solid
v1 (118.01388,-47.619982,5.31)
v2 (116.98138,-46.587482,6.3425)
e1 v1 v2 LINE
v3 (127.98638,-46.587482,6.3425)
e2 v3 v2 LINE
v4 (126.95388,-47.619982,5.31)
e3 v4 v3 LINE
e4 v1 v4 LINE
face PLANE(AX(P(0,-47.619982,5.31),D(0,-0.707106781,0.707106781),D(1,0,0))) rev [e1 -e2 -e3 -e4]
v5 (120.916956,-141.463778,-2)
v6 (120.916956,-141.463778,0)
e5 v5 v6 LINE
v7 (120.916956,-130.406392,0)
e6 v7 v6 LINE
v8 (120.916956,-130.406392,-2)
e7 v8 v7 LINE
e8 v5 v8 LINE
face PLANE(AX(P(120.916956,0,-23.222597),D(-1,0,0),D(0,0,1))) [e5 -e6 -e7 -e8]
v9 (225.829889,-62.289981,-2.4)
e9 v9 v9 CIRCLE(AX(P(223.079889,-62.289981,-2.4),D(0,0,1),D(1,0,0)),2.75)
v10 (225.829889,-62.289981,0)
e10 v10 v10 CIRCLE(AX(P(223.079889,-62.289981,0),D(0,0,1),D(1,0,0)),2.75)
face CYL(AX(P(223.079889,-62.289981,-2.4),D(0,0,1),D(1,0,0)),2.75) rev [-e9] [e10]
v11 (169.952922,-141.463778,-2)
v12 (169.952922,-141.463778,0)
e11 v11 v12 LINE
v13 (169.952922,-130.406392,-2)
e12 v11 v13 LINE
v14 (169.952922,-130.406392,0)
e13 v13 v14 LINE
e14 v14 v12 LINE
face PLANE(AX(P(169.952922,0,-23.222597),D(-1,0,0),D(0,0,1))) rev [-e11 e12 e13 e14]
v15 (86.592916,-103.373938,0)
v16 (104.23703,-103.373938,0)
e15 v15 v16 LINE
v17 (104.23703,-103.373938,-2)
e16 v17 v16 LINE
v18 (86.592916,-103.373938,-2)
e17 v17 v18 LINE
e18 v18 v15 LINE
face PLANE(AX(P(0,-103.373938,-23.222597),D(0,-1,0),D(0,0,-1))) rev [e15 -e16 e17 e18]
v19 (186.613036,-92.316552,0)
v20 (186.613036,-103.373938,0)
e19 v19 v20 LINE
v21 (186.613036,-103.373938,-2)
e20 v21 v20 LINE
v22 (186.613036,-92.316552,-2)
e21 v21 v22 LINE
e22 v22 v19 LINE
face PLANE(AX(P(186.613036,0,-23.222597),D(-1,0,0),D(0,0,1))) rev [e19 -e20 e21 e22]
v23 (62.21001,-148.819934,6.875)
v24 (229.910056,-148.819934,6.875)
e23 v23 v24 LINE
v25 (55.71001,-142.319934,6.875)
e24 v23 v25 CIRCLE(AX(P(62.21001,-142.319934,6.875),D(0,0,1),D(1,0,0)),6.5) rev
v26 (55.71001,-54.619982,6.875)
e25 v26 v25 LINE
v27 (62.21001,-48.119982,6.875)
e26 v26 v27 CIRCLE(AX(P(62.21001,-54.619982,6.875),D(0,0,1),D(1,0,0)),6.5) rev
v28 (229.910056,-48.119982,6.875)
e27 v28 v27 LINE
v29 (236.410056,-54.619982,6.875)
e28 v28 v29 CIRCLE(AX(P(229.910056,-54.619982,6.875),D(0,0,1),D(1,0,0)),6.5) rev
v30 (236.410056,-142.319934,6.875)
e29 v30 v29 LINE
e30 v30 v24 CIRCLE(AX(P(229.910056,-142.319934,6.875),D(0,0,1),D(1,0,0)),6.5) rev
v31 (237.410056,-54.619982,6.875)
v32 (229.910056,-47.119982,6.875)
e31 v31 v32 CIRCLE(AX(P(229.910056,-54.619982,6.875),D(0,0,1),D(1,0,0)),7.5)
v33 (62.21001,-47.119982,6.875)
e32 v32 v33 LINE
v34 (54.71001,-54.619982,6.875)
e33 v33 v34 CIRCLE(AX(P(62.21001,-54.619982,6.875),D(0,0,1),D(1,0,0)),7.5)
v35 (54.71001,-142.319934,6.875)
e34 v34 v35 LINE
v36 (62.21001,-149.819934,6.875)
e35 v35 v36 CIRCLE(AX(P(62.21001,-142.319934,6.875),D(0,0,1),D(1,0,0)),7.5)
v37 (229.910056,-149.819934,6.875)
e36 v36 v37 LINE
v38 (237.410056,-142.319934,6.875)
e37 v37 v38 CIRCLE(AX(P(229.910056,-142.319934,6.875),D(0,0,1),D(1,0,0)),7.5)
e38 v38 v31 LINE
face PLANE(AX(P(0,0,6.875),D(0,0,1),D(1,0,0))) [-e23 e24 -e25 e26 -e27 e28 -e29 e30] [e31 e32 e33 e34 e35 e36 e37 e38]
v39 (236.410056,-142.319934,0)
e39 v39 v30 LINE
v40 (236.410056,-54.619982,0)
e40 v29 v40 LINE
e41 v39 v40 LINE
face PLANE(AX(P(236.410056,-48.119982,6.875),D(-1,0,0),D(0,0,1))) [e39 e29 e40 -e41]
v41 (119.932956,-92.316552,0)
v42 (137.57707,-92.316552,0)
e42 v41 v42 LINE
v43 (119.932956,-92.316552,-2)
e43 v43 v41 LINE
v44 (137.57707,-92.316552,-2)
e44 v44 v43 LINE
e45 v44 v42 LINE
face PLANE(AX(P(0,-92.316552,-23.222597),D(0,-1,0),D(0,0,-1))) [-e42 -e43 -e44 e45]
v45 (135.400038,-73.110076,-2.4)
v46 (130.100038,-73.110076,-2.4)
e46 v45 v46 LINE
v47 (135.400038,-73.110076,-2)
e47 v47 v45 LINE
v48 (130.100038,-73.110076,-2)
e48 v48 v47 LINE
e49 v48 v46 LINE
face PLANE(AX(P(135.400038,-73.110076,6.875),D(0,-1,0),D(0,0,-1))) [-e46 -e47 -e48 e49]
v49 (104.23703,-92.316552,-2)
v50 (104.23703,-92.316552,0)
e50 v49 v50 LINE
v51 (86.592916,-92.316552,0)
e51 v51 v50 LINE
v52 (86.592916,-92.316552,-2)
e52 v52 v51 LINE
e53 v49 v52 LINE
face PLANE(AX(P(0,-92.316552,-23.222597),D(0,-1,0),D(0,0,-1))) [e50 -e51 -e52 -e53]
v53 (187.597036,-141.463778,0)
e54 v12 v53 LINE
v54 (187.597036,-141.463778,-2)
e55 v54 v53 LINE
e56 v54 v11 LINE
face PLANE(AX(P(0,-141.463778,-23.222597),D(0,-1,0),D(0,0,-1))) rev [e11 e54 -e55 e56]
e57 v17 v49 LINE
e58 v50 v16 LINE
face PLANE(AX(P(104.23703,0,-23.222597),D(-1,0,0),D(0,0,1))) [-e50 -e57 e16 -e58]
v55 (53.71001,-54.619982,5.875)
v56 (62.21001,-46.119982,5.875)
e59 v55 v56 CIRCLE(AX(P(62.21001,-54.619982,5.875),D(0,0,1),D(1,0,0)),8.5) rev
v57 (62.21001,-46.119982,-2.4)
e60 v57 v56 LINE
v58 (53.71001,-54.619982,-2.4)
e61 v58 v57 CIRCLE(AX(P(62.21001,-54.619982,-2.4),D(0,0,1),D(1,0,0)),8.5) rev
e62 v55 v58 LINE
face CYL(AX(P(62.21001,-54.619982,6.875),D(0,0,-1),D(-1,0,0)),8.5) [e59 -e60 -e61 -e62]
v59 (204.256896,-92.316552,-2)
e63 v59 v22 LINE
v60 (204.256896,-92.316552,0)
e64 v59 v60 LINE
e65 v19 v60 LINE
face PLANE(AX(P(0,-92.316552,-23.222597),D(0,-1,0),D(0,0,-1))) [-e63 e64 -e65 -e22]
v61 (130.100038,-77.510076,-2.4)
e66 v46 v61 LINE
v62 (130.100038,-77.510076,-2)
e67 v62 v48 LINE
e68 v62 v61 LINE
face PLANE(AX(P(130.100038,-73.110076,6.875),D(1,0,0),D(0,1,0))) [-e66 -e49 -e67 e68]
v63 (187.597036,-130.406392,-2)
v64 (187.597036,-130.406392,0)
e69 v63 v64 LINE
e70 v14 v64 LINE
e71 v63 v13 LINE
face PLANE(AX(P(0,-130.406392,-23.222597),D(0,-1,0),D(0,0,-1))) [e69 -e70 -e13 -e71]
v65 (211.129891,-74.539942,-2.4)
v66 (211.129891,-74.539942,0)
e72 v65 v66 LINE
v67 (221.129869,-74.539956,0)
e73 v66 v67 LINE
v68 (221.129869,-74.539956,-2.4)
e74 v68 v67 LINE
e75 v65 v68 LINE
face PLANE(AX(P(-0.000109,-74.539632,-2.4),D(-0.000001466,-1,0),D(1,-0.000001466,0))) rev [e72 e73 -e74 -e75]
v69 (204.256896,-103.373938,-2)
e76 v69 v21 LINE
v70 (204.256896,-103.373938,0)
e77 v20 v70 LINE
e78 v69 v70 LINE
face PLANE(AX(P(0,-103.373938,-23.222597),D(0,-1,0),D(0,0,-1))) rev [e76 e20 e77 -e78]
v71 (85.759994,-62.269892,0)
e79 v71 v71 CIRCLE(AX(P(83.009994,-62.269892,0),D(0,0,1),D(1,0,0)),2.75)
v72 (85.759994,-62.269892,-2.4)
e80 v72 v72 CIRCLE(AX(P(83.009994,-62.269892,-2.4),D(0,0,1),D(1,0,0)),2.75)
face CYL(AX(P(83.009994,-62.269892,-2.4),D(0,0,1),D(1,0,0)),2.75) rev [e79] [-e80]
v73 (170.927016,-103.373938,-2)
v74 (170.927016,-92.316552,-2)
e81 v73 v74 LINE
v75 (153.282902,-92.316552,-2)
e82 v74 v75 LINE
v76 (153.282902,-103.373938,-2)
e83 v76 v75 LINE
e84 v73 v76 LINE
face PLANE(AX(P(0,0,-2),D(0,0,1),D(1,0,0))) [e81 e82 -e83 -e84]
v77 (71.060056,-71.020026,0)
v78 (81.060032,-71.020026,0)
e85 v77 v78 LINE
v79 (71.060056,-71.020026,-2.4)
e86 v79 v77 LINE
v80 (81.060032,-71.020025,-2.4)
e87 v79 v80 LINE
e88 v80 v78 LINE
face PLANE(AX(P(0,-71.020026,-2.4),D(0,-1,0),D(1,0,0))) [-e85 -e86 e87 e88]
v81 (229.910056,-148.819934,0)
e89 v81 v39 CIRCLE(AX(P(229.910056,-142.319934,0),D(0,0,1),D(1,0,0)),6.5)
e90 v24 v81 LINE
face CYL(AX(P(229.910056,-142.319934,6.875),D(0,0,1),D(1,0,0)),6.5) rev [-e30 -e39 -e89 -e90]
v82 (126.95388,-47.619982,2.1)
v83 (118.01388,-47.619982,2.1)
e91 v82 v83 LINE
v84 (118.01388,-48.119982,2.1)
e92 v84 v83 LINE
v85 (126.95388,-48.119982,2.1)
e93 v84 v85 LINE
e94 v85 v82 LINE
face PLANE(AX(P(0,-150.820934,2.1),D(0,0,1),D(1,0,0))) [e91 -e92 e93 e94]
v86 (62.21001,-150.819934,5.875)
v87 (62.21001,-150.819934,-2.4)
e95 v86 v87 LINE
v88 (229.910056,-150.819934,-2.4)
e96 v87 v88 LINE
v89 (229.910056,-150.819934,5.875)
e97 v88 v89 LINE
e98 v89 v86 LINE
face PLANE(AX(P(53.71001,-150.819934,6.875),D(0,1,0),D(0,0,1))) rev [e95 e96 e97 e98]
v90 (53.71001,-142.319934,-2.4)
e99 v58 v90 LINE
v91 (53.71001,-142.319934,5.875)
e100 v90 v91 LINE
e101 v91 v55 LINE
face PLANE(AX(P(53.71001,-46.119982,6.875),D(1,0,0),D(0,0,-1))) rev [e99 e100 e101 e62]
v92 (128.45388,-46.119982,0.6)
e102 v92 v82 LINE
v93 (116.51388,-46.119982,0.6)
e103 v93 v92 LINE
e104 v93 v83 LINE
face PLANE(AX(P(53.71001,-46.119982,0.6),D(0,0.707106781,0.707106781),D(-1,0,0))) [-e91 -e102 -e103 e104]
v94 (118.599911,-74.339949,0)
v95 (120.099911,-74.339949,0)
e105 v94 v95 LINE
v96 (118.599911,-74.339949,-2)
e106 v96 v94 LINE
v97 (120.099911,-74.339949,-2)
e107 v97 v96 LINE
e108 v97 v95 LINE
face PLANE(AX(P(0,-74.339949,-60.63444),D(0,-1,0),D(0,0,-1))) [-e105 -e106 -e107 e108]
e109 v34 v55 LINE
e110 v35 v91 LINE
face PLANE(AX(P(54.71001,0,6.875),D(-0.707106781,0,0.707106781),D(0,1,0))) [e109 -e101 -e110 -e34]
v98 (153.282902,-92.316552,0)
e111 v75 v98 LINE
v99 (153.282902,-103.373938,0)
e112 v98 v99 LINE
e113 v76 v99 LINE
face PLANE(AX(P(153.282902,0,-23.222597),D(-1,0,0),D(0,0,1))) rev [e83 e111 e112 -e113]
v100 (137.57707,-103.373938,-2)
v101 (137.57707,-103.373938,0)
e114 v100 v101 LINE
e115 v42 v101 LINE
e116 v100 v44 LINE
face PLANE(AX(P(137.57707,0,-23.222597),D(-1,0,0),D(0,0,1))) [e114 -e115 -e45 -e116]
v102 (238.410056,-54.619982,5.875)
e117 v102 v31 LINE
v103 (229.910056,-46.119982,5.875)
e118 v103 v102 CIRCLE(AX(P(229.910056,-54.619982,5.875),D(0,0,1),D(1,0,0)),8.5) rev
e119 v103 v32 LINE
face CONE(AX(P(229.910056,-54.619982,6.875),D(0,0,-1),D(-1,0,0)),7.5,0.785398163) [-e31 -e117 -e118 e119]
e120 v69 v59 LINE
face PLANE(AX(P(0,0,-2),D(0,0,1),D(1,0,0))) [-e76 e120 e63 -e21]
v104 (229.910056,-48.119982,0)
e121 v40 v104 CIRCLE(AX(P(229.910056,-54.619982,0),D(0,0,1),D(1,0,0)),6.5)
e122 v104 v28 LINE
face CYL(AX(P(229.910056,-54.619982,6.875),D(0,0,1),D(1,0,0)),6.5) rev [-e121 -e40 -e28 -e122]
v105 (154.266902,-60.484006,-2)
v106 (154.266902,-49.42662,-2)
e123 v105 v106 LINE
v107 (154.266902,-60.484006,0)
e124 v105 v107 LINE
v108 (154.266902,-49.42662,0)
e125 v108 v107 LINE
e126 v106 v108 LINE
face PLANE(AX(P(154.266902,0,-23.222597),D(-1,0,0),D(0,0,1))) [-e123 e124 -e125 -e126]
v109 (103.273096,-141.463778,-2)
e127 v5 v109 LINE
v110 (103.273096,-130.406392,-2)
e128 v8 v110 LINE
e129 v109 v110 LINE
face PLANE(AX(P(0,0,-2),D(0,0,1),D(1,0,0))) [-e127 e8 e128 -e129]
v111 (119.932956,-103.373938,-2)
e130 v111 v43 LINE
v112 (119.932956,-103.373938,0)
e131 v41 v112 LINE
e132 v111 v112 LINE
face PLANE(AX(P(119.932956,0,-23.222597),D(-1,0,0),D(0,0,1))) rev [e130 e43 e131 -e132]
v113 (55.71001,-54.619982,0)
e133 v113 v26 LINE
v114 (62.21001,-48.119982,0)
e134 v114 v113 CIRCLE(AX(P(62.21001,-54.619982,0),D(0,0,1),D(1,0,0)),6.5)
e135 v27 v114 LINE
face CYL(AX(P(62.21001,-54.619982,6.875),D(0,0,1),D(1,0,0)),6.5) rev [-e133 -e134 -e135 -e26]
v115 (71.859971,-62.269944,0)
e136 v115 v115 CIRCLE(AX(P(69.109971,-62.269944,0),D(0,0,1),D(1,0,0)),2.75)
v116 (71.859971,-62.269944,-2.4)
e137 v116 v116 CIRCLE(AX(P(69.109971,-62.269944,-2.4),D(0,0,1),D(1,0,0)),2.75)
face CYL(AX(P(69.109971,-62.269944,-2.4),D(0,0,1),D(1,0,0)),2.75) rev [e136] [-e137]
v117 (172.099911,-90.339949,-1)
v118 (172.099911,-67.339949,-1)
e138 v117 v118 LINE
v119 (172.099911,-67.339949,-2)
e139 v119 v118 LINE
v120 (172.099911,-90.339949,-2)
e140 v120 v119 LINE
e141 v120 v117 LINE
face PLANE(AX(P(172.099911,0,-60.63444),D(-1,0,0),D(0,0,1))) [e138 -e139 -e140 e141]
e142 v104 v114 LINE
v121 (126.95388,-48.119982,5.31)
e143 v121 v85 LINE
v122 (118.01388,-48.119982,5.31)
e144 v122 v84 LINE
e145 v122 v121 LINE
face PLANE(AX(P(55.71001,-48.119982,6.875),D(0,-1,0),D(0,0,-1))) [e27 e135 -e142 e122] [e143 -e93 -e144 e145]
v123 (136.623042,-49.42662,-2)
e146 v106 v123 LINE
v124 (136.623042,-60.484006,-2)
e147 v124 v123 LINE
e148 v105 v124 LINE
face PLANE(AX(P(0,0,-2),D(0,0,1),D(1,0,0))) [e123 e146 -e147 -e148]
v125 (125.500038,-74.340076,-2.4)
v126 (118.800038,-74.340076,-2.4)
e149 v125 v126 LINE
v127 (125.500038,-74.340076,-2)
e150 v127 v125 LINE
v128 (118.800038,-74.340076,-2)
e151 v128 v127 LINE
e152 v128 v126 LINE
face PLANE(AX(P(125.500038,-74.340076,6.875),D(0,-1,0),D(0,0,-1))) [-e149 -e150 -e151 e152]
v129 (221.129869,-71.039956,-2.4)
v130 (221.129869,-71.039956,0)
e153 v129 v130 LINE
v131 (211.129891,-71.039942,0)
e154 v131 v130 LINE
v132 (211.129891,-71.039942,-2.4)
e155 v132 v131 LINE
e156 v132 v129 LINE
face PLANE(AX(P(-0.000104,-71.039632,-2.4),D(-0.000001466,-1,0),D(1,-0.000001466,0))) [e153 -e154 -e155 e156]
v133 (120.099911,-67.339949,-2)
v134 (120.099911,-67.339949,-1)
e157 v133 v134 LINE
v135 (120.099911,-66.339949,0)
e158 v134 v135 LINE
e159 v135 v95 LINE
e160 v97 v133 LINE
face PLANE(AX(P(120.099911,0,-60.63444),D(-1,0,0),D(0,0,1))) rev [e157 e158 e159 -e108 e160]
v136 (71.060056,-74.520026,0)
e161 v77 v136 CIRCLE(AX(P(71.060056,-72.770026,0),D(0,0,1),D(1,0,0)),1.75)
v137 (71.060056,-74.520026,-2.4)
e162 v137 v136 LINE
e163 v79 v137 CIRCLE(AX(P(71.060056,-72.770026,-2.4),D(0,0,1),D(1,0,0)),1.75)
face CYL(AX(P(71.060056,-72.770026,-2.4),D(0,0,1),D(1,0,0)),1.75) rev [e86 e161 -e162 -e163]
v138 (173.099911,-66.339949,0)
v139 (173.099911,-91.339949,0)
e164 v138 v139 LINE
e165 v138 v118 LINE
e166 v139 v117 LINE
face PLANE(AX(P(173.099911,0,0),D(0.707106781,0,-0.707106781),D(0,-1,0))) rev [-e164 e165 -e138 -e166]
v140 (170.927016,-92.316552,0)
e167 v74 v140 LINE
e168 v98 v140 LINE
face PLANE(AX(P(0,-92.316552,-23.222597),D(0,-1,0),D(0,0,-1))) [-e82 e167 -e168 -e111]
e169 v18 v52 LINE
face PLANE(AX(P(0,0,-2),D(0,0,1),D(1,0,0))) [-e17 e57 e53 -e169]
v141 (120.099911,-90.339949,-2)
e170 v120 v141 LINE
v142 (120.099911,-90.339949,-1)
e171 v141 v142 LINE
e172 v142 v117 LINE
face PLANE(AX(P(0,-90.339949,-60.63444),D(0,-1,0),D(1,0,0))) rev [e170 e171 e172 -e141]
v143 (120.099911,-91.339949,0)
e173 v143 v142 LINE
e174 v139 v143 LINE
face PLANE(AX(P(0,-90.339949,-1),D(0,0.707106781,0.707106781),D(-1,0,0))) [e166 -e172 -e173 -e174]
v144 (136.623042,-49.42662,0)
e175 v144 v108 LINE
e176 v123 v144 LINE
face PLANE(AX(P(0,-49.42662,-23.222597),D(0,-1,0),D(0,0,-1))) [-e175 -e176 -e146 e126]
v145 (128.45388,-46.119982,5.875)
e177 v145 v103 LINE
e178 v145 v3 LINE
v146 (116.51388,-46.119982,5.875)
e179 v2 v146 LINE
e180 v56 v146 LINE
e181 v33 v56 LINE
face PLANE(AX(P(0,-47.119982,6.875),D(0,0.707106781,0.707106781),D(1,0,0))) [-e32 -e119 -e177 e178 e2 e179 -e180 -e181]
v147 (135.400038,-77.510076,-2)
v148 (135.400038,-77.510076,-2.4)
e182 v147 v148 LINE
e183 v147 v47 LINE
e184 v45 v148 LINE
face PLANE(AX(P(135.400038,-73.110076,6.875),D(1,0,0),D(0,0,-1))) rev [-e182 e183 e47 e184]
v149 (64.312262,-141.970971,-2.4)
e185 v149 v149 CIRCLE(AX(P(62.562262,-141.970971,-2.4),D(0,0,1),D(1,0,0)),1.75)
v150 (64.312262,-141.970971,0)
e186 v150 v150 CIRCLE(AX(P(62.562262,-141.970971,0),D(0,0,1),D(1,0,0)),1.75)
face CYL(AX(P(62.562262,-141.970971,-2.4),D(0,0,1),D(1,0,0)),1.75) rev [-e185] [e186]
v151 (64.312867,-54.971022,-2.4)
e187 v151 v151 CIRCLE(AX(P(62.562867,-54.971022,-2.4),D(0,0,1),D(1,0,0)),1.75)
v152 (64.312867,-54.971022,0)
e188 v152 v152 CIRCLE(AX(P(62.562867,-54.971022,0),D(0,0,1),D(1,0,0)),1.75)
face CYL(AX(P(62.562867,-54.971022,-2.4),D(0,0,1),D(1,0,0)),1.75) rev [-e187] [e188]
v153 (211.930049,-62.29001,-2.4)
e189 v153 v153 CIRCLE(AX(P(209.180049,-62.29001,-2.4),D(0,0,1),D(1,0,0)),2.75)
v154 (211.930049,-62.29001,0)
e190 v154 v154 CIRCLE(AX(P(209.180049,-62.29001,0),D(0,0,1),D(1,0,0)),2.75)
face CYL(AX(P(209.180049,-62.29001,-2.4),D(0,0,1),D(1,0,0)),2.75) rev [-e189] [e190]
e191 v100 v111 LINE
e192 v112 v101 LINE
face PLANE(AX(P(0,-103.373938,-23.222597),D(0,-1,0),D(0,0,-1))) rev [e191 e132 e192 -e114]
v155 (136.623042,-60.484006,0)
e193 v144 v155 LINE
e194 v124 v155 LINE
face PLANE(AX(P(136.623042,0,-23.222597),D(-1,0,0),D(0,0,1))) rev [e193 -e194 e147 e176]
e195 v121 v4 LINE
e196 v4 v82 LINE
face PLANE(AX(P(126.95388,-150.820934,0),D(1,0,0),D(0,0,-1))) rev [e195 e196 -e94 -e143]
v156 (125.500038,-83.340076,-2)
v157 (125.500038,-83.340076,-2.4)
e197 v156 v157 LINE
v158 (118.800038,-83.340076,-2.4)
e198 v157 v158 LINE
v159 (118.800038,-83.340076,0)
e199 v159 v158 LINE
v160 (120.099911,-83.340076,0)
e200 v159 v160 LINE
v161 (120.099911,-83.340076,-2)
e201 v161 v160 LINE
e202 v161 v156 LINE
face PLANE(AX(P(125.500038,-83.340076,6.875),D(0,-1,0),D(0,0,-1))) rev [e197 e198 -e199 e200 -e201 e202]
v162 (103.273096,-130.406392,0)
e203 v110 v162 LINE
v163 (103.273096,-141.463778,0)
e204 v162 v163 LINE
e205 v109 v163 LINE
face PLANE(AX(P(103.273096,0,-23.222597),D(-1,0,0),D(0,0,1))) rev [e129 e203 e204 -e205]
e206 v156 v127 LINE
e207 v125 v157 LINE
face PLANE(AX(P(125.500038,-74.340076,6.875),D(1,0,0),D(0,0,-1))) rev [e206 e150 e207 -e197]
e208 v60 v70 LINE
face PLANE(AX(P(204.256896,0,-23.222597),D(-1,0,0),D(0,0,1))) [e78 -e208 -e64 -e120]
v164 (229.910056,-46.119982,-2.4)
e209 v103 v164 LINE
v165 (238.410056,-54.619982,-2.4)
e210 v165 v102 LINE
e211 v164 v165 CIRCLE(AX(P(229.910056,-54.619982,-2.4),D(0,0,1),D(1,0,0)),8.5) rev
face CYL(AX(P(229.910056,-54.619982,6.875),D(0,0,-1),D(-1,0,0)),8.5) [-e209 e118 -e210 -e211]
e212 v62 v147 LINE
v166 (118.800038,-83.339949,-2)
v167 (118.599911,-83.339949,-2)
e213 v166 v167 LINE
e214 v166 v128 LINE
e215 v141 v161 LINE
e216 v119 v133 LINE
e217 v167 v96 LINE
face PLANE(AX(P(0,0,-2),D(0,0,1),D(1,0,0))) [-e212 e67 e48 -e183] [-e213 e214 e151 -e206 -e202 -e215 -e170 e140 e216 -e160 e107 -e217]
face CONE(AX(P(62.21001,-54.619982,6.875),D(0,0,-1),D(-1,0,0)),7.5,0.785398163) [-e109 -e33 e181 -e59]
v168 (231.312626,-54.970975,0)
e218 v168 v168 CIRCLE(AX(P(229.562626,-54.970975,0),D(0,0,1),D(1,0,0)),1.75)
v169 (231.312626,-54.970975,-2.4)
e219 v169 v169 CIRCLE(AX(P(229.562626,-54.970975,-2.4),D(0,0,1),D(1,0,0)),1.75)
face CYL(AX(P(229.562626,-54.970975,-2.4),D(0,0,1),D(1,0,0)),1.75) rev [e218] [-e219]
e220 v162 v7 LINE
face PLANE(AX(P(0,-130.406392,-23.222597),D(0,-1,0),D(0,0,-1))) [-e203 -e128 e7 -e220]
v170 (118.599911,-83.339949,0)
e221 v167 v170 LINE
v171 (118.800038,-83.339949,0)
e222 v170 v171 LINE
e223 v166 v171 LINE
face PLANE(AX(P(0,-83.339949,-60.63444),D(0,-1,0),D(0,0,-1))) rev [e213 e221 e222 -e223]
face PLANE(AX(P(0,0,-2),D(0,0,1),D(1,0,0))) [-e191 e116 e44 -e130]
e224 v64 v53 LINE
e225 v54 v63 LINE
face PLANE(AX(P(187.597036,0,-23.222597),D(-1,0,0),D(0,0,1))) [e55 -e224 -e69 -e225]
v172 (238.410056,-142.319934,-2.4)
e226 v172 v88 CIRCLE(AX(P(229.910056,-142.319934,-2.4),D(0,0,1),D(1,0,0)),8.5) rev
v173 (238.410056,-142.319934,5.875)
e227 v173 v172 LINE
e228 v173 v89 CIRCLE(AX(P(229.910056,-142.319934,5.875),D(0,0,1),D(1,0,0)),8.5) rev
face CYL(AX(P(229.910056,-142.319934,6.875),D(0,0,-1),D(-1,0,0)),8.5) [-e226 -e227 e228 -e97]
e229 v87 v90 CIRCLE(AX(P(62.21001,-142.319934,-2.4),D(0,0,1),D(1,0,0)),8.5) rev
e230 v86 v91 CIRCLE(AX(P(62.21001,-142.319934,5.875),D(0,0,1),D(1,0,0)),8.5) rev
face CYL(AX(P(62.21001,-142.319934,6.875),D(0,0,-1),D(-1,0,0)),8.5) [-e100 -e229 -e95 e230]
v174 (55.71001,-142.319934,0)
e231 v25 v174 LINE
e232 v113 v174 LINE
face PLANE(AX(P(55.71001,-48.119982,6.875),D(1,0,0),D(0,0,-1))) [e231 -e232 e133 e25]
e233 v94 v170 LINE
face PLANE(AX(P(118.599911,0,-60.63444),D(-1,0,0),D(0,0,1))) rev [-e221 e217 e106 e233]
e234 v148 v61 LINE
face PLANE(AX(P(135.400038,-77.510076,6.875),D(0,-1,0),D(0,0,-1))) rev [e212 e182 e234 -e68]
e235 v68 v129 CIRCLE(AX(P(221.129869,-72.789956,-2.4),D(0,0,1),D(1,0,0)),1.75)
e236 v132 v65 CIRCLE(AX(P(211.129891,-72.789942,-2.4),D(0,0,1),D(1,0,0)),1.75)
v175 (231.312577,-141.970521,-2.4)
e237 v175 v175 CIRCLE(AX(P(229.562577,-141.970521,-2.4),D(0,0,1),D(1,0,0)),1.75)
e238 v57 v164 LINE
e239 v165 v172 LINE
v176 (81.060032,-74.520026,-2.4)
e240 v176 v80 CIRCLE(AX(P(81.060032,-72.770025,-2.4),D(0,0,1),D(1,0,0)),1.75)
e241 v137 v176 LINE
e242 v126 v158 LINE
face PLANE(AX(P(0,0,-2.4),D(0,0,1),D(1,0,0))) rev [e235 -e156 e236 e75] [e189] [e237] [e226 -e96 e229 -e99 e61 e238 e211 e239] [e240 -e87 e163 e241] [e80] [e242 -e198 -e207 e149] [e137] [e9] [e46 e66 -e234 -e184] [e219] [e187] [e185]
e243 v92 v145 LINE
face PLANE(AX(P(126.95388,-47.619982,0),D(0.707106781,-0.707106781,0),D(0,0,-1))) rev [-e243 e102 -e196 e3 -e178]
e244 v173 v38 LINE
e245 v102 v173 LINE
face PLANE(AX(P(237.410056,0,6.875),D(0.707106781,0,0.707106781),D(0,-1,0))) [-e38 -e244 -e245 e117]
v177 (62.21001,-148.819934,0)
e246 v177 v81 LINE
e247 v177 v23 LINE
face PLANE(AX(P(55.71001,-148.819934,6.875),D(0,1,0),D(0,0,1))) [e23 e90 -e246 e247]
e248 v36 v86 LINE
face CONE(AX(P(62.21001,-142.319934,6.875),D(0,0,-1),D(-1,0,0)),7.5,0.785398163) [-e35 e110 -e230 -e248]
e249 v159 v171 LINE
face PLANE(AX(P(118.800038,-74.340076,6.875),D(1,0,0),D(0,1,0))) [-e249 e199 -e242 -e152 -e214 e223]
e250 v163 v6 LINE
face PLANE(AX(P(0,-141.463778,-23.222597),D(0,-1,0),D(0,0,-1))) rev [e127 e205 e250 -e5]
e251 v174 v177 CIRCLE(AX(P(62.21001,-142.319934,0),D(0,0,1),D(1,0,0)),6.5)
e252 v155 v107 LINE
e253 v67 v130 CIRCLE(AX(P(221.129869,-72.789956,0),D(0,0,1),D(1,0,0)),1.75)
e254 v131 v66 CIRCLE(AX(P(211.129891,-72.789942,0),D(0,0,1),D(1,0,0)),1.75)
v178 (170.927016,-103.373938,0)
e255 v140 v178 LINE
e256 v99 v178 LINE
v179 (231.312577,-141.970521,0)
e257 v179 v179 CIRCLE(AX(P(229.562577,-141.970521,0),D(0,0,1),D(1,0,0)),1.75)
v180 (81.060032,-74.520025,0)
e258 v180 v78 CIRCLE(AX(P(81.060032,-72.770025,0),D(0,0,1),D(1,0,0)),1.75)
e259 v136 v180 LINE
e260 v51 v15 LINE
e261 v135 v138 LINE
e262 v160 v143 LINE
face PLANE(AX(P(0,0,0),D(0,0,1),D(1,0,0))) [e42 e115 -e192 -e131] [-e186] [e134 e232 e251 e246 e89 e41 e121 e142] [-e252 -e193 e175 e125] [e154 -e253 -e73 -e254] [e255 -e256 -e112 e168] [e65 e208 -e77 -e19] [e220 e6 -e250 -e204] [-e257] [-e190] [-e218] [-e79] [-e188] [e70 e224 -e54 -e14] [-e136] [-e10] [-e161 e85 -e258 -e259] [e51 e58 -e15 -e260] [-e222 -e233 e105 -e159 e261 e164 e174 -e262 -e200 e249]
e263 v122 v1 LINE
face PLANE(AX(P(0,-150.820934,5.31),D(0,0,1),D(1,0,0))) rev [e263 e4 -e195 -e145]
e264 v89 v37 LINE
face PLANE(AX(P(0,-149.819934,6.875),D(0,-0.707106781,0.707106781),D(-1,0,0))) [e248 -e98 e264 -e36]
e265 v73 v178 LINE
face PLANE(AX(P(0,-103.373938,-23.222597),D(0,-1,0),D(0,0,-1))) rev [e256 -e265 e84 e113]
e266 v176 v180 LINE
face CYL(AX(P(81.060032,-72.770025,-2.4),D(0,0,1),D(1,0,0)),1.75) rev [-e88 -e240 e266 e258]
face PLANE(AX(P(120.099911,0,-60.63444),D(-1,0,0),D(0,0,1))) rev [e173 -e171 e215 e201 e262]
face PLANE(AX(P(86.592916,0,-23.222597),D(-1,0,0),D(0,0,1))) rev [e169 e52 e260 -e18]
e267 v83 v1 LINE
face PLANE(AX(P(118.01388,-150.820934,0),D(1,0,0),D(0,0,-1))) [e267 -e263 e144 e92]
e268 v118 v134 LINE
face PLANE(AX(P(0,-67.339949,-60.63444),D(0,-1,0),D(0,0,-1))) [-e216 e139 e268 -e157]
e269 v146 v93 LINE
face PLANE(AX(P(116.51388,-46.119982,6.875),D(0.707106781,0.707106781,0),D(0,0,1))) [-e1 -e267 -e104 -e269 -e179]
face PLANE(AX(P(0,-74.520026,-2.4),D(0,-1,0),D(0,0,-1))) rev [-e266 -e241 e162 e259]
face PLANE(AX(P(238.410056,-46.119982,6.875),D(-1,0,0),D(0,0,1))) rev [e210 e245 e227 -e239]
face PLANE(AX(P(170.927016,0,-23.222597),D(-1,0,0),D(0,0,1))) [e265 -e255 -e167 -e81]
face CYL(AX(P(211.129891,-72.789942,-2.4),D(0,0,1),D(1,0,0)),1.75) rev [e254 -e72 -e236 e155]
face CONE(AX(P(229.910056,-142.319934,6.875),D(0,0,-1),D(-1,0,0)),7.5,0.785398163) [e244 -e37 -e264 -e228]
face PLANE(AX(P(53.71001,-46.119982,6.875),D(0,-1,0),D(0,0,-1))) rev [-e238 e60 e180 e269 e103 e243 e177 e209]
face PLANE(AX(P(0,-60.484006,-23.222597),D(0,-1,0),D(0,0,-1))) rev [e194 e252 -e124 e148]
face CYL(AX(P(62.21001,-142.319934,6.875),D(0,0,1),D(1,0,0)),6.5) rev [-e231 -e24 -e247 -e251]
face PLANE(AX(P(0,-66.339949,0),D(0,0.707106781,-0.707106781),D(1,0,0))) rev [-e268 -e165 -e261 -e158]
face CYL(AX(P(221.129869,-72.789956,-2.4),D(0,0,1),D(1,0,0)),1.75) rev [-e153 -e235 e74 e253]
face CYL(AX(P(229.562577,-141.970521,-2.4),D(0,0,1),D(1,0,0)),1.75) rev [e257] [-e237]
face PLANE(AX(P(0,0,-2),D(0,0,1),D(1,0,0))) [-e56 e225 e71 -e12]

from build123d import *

# Parameters (mm, degrees)
SKETCH8_W                = 184.700046
SKETCH8_H                = 104.699952
SKETCH8_W_2              = 180.700046
SKETCH8_H_2              = 100.699952
BOSS_EXTRUDE1_DEPTH      = 6.875
BOSS_EXTRUDE2_START      = -2.4
BOSS_EXTRUDE2_OUTLINE_W  = 184.700046
BOSS_EXTRUDE2_OUTLINE_H  = 104.699952
BOSS_EXTRUDE2_DEPTH      = 2.4
FILLET1_R                = 6.5
FILLET2_R                = 8.5
CUT_EXTRUDE1_START       = -2.4
CUT_EXTRUDE1_OUTLINE_R   = 1.75
CUT_EXTRUDE1_OUTLINE_R_2 = 2.75
CUT_EXTRUDE1_DEPTH       = 2.4
SKETCH10_7_W             = 17.644114
SKETCH10_7_H             = 11.057386
SKETCH10_7_W_2           = 17.64386
CUT_EXTRUDE5_DEPTH       = 2
SKETCH10_5_W             = 52
SKETCH10_5_H             = 23
SKETCH10_5_W_2           = 1.5
SKETCH10_5_H_2           = 9
CUT_EXTRUDE2_DEPTH       = 2
SKETCH11_W               = 5.3
SKETCH11_H               = 4.4
SKETCH11_W_2             = 6.7
SKETCH11_H_2             = 9
CUT_EXTRUDE3_DEPTH       = 283.262347682
CUT_EXTRUDE4_REACH       = 262.478
SKETCH13_W               = 8.94
SKETCH13_H               = 3.21
CHAMFER1_SIZE            = 1


# Read off the part's stored shape, not the designer's step: Boss-Extrude2, Cut-Extrude1
with BuildPart() as part:
    # Sketch8 → Boss-Extrude1 (new body)
    with BuildSketch(Plane.XY):
        with Locations((146.060033, -98.469958)):
            Rectangle(SKETCH8_W, SKETCH8_H)
        with Locations((146.060033, -98.469958)):
            Rectangle(SKETCH8_W_2, SKETCH8_H_2, mode=Mode.SUBTRACT)
    extrude(amount=BOSS_EXTRUDE1_DEPTH)

    # Boss-Extrude2 outline → Boss-Extrude2 (add)
    with BuildSketch(Plane.XY.offset(BOSS_EXTRUDE2_START)):
        with Locations((146.060033, -98.469958)):
            Rectangle(BOSS_EXTRUDE2_OUTLINE_W, BOSS_EXTRUDE2_OUTLINE_H)
    extrude(amount=BOSS_EXTRUDE2_DEPTH)

    # Fillet1
    fillet1_edges = [part.edges().sort_by_distance(p)[0] for p in [
        (55.71001, -48.119982, 3.4375),
        (55.71001, -148.819934, 3.4375),
        (236.410056, -148.819934, 3.4375),
        (236.410056, -48.119982, 3.4375),
    ]]
    fillet(fillet1_edges, radius=FILLET1_R)

    # Fillet2
    fillet2_edges = [part.edges().sort_by_distance(p)[0] for p in [
        (53.71001, -46.119982, 2.2375),
        (238.410056, -46.119982, 2.2375),
        (238.410056, -150.819934, 2.2375),
        (53.71001, -150.819934, 2.2375),
    ]]
    fillet(fillet2_edges, radius=FILLET2_R)

    # Cut-Extrude1 outline → Cut-Extrude1 (cut)
    with BuildSketch(Plane.XY.offset(CUT_EXTRUDE1_START)):
        with BuildLine():
            ThreePointArc((211.129890659, -71.039941661), (209.379890659, -72.789941661), (211.129890659, -74.539941661))
            Line((211.129890659, -74.539941661), (221.129869217, -74.539956319))
            ThreePointArc((221.129869217, -74.539956319), (222.879869217, -72.789956319), (221.129869217, -71.039956319))
            Line((221.129869217, -71.039956319), (211.129890659, -71.039941661))
        make_face()
        with BuildLine():
            ThreePointArc((71.060056, -71.020026355), (69.310056, -72.770026355), (71.060056, -74.520026355))
            Line((71.060056, -74.520026355), (81.060031996, -74.520024697))
            ThreePointArc((81.060031996, -74.520024697), (82.810031996, -72.770024697), (81.060031996, -71.020024697))
            Line((81.060031996, -71.020024697), (71.060056, -71.020026355))
        make_face()
        with Locations((62.562867, -54.971021734)):
            Circle(CUT_EXTRUDE1_OUTLINE_R)
        with Locations((62.562261827, -141.970970853)):
            Circle(CUT_EXTRUDE1_OUTLINE_R)
        with Locations((229.562577334, -141.970520822)):
            Circle(CUT_EXTRUDE1_OUTLINE_R)
        with Locations((229.562626116, -54.970974994)):
            Circle(CUT_EXTRUDE1_OUTLINE_R)
        with Locations((69.109971, -62.269943649)):
            Circle(CUT_EXTRUDE1_OUTLINE_R_2)
        with Locations((83.009994, -62.269891837)):
            Circle(CUT_EXTRUDE1_OUTLINE_R_2)
        with Locations((223.079889236, -62.289981332)):
            Circle(CUT_EXTRUDE1_OUTLINE_R_2)
        with Locations((209.180049, -62.290009649)):
            Circle(CUT_EXTRUDE1_OUTLINE_R_2)
    extrude(amount=CUT_EXTRUDE1_DEPTH, mode=Mode.SUBTRACT)

    # Sketch10<7> → Cut-Extrude5 (cut)
    with BuildSketch(Plane.XY):
        with Locations((95.414973, -97.845245)):
            Rectangle(SKETCH10_7_W, SKETCH10_7_H)
        with Locations((128.755013, -97.845245)):
            Rectangle(SKETCH10_7_W, SKETCH10_7_H)
        with Locations((162.104959, -97.845245)):
            Rectangle(SKETCH10_7_W, SKETCH10_7_H)
        with Locations((195.434966, -97.845245)):
            Rectangle(SKETCH10_7_W_2, SKETCH10_7_H)
        with Locations((112.095026, -135.935085)):
            Rectangle(SKETCH10_7_W_2, SKETCH10_7_H)
        with Locations((178.774979, -135.935085)):
            Rectangle(SKETCH10_7_W, SKETCH10_7_H)
        with Locations((145.444972, -54.955313)):
            Rectangle(SKETCH10_7_W_2, SKETCH10_7_H)
    extrude(amount=-CUT_EXTRUDE5_DEPTH, mode=Mode.SUBTRACT)

    # Sketch10<5> → Cut-Extrude2 (cut)
    with BuildSketch(Plane.XY):
        with Locations((146.099911, -78.839949)):
            Rectangle(SKETCH10_5_W, SKETCH10_5_H)
        with Locations((119.349911, -78.839949)):
            Rectangle(SKETCH10_5_W_2, SKETCH10_5_H_2)
    extrude(amount=-CUT_EXTRUDE2_DEPTH, mode=Mode.SUBTRACT)

    # Sketch11 → Cut-Extrude3 (cut, through all)
    with BuildSketch(Plane(origin=(0, 0, -2.4), x_dir=(-1, 0, 0), z_dir=(0, 0, -1))):
        with Locations((-132.750038, -75.310076)):
            Rectangle(SKETCH11_W, SKETCH11_H)
        with Locations((-122.150038, -78.840076)):
            Rectangle(SKETCH11_W_2, SKETCH11_H_2)
    extrude(amount=-CUT_EXTRUDE3_DEPTH, mode=Mode.SUBTRACT)

    # Sketch13 → Cut-Extrude4 (cut, up to next)
    with BuildSketch(Plane(origin=(0, -46.119982, 0), x_dir=(1, 0, 0), z_dir=(0, 1, 0)), mode=Mode.PRIVATE) as cut_extrude4_sk1:
        with Locations((122.48388, -3.705)):
            Rectangle(SKETCH13_W, SKETCH13_H)
    cut_extrude4_tool1 = extrude(cut_extrude4_sk1.sketch, amount=-CUT_EXTRUDE4_REACH, mode=Mode.PRIVATE) & part.part
    add(cut_extrude4_tool1.solids().sort_by_distance((122.48388, -46.119982, 3.705))[0], mode=Mode.SUBTRACT)

    # Chamfer1
    chamfer1_edges = [part.edges().sort_by_distance(p)[0] for p in [
        (146.099911, -90.339949, 0),
        (146.099911, -67.339949, 0),
        (172.099911, -78.839949, 0),
        (238.410056, -98.469958, 6.875),
        (146.060033, -150.819934, 6.875),
        (53.71001, -98.469958, 6.875),
        (146.060033, -46.119982, 6.875),
        (56.19960236, -48.60957436, 6.875),
        (235.92046364, -48.60957436, 6.875),
        (56.19960236, -148.33034164, 6.875),
        (235.92046364, -148.33034164, 6.875),
    ]]
    chamfer(chamfer1_edges, length=CHAMFER1_SIZE)

    # Chamfer2
    # the kernel refuses this chamfer: 1.5 mm, written as the material it takes off along each edge
    with BuildSketch(Plane(origin=(118.01388, -46.119982, 5.31), x_dir=(0, 0.02749587661058678, 0.9996219169112968), z_dir=(1, 0, 0)), Plane(origin=(126.95388, -46.119982, 2.1), x_dir=(0, 0.027495876610586778, -0.9996219169112968), z_dir=(-1, 0, 0))) as chamfer2_piece_1:
        with BuildLine():
            Line((1.543009793, 0), (-0.084820732, 1.54067669))
            Line((-0.084820732, 1.54067669), (-0.11480939, 1.539851814))
            ThreePointArc((-0.11480939, 1.539851814), (-0.051193841, 0.770096744), (-0.029988658, -0.000824876))
            Line((-0.029988658, -0.000824876), (0.000824876, -0.029988658))
            ThreePointArc((0.000824876, -0.029988658), (0.771746497, -0.008783474), (1.543834669, -0.029988658))
            Line((1.543834669, -0.029988658), (1.543009793, 0))
        make_face()
    extrude(amount=8.94, mode=Mode.SUBTRACT)
    with BuildSketch(Plane(origin=(126.95388, -46.119982, 5.31), x_dir=(0.9996219169112968, 0.027495876610586893, 0), z_dir=(0, 0, -1)), Plane(origin=(118.01388, -46.119982, 2.1), x_dir=(-0.9996219169112968, 0.027495876610586893, 0), z_dir=(0, 0, 1))) as chamfer2_piece_2:
        with BuildLine():
            Line((1.543009793, 0), (-0.084820732, 1.54067669))
            Line((-0.084820732, 1.54067669), (-0.11480939, 1.539851814))
            ThreePointArc((-0.11480939, 1.539851814), (-0.051193841, 0.770096744), (-0.029988658, -0.000824876))
            Line((-0.029988658, -0.000824876), (0.000824876, -0.029988658))
            ThreePointArc((0.000824876, -0.029988658), (0.771746497, -0.008783474), (1.543834669, -0.029988658))
            Line((1.543834669, -0.029988658), (1.543009793, 0))
        make_face()
    extrude(amount=3.21, mode=Mode.SUBTRACT)
    with BuildSketch(Plane(origin=(118.01388, -46.119982, 2.1), x_dir=(-0.9996219169112968, 0.027495876610586893, 0), z_dir=(0, 0, 1))) as chamfer2_piece_3a_section:
        with BuildLine():
            Line((1.543009793, 0), (-0.084820732, 1.54067669))
            Line((-0.084820732, 1.54067669), (-0.11480939, 1.539851814))
            ThreePointArc((-0.11480939, 1.539851814), (-0.051193841, 0.770096744), (-0.029988658, -0.000824876))
            Line((-0.029988658, -0.000824876), (0.000824876, -0.029988658))
            ThreePointArc((0.000824876, -0.029988658), (0.771746497, -0.008783474), (1.543834669, -0.029988658))
            Line((1.543834669, -0.029988658), (1.543009793, 0))
        make_face()
    chamfer2_piece_3a = extrude(amount=7.067524482, mode=Mode.PRIVATE)
    chamfer2_piece_3a = split(chamfer2_piece_3a, bisect_by=Plane(origin=(117.51918956, -46.61467244, 5.31), z_dir=(0, 0, 1)), keep=Keep.TOP, mode=Mode.PRIVATE)
    with BuildSketch(Plane(origin=(114.156355518, -46.119982, 5.31), x_dir=(0, 0.02749587661058678, 0.9996219169112968), z_dir=(1, 0, 0))) as chamfer2_piece_3b_section:
        with BuildLine():
            Line((1.543009793, 0), (-0.084820732, 1.54067669))
            Line((-0.084820732, 1.54067669), (-0.11480939, 1.539851814))
            ThreePointArc((-0.11480939, 1.539851814), (-0.051193841, 0.770096744), (-0.029988658, -0.000824876))
            Line((-0.029988658, -0.000824876), (0.000824876, -0.029988658))
            ThreePointArc((0.000824876, -0.029988658), (0.771746497, -0.008783474), (1.543834669, -0.029988658))
            Line((1.543834669, -0.029988658), (1.543009793, 0))
        make_face()
    chamfer2_piece_3b = extrude(amount=12.797524482, mode=Mode.PRIVATE)
    chamfer2_piece_3b = split(chamfer2_piece_3b, bisect_by=Plane(origin=(118.01388, -46.61467244, 5.80469044), z_dir=(-1, 0, 0)), keep=Keep.TOP, mode=Mode.PRIVATE)
    chamfer2_piece_3 = chamfer2_piece_3a & chamfer2_piece_3b
    add(chamfer2_piece_3, mode=Mode.SUBTRACT)
    with BuildSketch(Plane(origin=(126.95388, -46.119982, 9.167524482), x_dir=(0.9996219169112968, 0.027495876610586893, 0), z_dir=(0, 0, -1))) as chamfer2_piece_4a_section:
        with BuildLine():
            Line((1.543009793, 0), (-0.084820732, 1.54067669))
            Line((-0.084820732, 1.54067669), (-0.11480939, 1.539851814))
            ThreePointArc((-0.11480939, 1.539851814), (-0.051193841, 0.770096744), (-0.029988658, -0.000824876))
            Line((-0.029988658, -0.000824876), (0.000824876, -0.029988658))
            ThreePointArc((0.000824876, -0.029988658), (0.771746497, -0.008783474), (1.543834669, -0.029988658))
            Line((1.543834669, -0.029988658), (1.543009793, 0))
        make_face()
    chamfer2_piece_4a = extrude(amount=7.067524482, mode=Mode.PRIVATE)
    chamfer2_piece_4a = split(chamfer2_piece_4a, bisect_by=Plane(origin=(127.44857044, -46.61467244, 5.31), z_dir=(0, 0, 1)), keep=Keep.TOP, mode=Mode.PRIVATE)
    with BuildSketch(Plane(origin=(118.01388, -46.119982, 5.31), x_dir=(0, 0.02749587661058678, 0.9996219169112968), z_dir=(1, 0, 0))) as chamfer2_piece_4b_section:
        with BuildLine():
            Line((1.543009793, 0), (-0.084820732, 1.54067669))
            Line((-0.084820732, 1.54067669), (-0.11480939, 1.539851814))
            ThreePointArc((-0.11480939, 1.539851814), (-0.051193841, 0.770096744), (-0.029988658, -0.000824876))
            Line((-0.029988658, -0.000824876), (0.000824876, -0.029988658))
            ThreePointArc((0.000824876, -0.029988658), (0.771746497, -0.008783474), (1.543834669, -0.029988658))
            Line((1.543834669, -0.029988658), (1.543009793, 0))
        make_face()
    chamfer2_piece_4b = extrude(amount=12.797524482, mode=Mode.PRIVATE)
    chamfer2_piece_4b = split(chamfer2_piece_4b, bisect_by=Plane(origin=(126.95388, -46.61467244, 5.80469044), z_dir=(1, 0, 0)), keep=Keep.TOP, mode=Mode.PRIVATE)
    chamfer2_piece_4 = chamfer2_piece_4a & chamfer2_piece_4b
    add(chamfer2_piece_4, mode=Mode.SUBTRACT)
    with BuildSketch(Plane(origin=(126.95388, -46.119982, 5.31), x_dir=(0.9996219169112968, 0.027495876610586893, 0), z_dir=(0, 0, -1))) as chamfer2_piece_5a_section:
        with BuildLine():
            Line((1.543009793, 0), (-0.084820732, 1.54067669))
            Line((-0.084820732, 1.54067669), (-0.11480939, 1.539851814))
            ThreePointArc((-0.11480939, 1.539851814), (-0.051193841, 0.770096744), (-0.029988658, -0.000824876))
            Line((-0.029988658, -0.000824876), (0.000824876, -0.029988658))
            ThreePointArc((0.000824876, -0.029988658), (0.771746497, -0.008783474), (1.543834669, -0.029988658))
            Line((1.543834669, -0.029988658), (1.543009793, 0))
        make_face()
    chamfer2_piece_5a = extrude(amount=7.067524482, mode=Mode.PRIVATE)
    chamfer2_piece_5a = split(chamfer2_piece_5a, bisect_by=Plane(origin=(127.44857044, -46.61467244, 2.1), z_dir=(0, 0, -1)), keep=Keep.TOP, mode=Mode.PRIVATE)
    with BuildSketch(Plane(origin=(130.811404482, -46.119982, 2.1), x_dir=(0, 0.027495876610586778, -0.9996219169112968), z_dir=(-1, 0, 0))) as chamfer2_piece_5b_section:
        with BuildLine():
            Line((1.543009793, 0), (-0.084820732, 1.54067669))
            Line((-0.084820732, 1.54067669), (-0.11480939, 1.539851814))
            ThreePointArc((-0.11480939, 1.539851814), (-0.051193841, 0.770096744), (-0.029988658, -0.000824876))
            Line((-0.029988658, -0.000824876), (0.000824876, -0.029988658))
            ThreePointArc((0.000824876, -0.029988658), (0.771746497, -0.008783474), (1.543834669, -0.029988658))
            Line((1.543834669, -0.029988658), (1.543009793, 0))
        make_face()
    chamfer2_piece_5b = extrude(amount=12.797524482, mode=Mode.PRIVATE)
    chamfer2_piece_5b = split(chamfer2_piece_5b, bisect_by=Plane(origin=(126.95388, -46.61467244, 1.60530956), z_dir=(1, 0, 0)), keep=Keep.TOP, mode=Mode.PRIVATE)
    chamfer2_piece_5 = chamfer2_piece_5a & chamfer2_piece_5b
    add(chamfer2_piece_5, mode=Mode.SUBTRACT)
    with BuildSketch(Plane(origin=(126.95388, -46.119982, 2.1), x_dir=(0, 0.027495876610586778, -0.9996219169112968), z_dir=(-1, 0, 0))) as chamfer2_piece_6a_section:
        with BuildLine():
            Line((1.543009793, 0), (-0.084820732, 1.54067669))
            Line((-0.084820732, 1.54067669), (-0.11480939, 1.539851814))
            ThreePointArc((-0.11480939, 1.539851814), (-0.051193841, 0.770096744), (-0.029988658, -0.000824876))
            Line((-0.029988658, -0.000824876), (0.000824876, -0.029988658))
            ThreePointArc((0.000824876, -0.029988658), (0.771746497, -0.008783474), (1.543834669, -0.029988658))
            Line((1.543834669, -0.029988658), (1.543009793, 0))
        make_face()
    chamfer2_piece_6a = extrude(amount=12.797524482, mode=Mode.PRIVATE)
    chamfer2_piece_6a = split(chamfer2_piece_6a, bisect_by=Plane(origin=(118.01388, -46.61467244, 1.60530956), z_dir=(-1, 0, 0)), keep=Keep.TOP, mode=Mode.PRIVATE)
    with BuildSketch(Plane(origin=(118.01388, -46.119982, -1.757524482), x_dir=(-0.9996219169112968, 0.027495876610586893, 0), z_dir=(0, 0, 1))) as chamfer2_piece_6b_section:
        with BuildLine():
            Line((1.543009793, 0), (-0.084820732, 1.54067669))
            Line((-0.084820732, 1.54067669), (-0.11480939, 1.539851814))
            ThreePointArc((-0.11480939, 1.539851814), (-0.051193841, 0.770096744), (-0.029988658, -0.000824876))
            Line((-0.029988658, -0.000824876), (0.000824876, -0.029988658))
            ThreePointArc((0.000824876, -0.029988658), (0.771746497, -0.008783474), (1.543834669, -0.029988658))
            Line((1.543834669, -0.029988658), (1.543009793, 0))
        make_face()
    chamfer2_piece_6b = extrude(amount=7.067524482, mode=Mode.PRIVATE)
    chamfer2_piece_6b = split(chamfer2_piece_6b, bisect_by=Plane(origin=(117.51918956, -46.61467244, 2.1), z_dir=(0, 0, -1)), keep=Keep.TOP, mode=Mode.PRIVATE)
    chamfer2_piece_6 = chamfer2_piece_6a & chamfer2_piece_6b
    add(chamfer2_piece_6, mode=Mode.SUBTRACT)


solid = part.part
